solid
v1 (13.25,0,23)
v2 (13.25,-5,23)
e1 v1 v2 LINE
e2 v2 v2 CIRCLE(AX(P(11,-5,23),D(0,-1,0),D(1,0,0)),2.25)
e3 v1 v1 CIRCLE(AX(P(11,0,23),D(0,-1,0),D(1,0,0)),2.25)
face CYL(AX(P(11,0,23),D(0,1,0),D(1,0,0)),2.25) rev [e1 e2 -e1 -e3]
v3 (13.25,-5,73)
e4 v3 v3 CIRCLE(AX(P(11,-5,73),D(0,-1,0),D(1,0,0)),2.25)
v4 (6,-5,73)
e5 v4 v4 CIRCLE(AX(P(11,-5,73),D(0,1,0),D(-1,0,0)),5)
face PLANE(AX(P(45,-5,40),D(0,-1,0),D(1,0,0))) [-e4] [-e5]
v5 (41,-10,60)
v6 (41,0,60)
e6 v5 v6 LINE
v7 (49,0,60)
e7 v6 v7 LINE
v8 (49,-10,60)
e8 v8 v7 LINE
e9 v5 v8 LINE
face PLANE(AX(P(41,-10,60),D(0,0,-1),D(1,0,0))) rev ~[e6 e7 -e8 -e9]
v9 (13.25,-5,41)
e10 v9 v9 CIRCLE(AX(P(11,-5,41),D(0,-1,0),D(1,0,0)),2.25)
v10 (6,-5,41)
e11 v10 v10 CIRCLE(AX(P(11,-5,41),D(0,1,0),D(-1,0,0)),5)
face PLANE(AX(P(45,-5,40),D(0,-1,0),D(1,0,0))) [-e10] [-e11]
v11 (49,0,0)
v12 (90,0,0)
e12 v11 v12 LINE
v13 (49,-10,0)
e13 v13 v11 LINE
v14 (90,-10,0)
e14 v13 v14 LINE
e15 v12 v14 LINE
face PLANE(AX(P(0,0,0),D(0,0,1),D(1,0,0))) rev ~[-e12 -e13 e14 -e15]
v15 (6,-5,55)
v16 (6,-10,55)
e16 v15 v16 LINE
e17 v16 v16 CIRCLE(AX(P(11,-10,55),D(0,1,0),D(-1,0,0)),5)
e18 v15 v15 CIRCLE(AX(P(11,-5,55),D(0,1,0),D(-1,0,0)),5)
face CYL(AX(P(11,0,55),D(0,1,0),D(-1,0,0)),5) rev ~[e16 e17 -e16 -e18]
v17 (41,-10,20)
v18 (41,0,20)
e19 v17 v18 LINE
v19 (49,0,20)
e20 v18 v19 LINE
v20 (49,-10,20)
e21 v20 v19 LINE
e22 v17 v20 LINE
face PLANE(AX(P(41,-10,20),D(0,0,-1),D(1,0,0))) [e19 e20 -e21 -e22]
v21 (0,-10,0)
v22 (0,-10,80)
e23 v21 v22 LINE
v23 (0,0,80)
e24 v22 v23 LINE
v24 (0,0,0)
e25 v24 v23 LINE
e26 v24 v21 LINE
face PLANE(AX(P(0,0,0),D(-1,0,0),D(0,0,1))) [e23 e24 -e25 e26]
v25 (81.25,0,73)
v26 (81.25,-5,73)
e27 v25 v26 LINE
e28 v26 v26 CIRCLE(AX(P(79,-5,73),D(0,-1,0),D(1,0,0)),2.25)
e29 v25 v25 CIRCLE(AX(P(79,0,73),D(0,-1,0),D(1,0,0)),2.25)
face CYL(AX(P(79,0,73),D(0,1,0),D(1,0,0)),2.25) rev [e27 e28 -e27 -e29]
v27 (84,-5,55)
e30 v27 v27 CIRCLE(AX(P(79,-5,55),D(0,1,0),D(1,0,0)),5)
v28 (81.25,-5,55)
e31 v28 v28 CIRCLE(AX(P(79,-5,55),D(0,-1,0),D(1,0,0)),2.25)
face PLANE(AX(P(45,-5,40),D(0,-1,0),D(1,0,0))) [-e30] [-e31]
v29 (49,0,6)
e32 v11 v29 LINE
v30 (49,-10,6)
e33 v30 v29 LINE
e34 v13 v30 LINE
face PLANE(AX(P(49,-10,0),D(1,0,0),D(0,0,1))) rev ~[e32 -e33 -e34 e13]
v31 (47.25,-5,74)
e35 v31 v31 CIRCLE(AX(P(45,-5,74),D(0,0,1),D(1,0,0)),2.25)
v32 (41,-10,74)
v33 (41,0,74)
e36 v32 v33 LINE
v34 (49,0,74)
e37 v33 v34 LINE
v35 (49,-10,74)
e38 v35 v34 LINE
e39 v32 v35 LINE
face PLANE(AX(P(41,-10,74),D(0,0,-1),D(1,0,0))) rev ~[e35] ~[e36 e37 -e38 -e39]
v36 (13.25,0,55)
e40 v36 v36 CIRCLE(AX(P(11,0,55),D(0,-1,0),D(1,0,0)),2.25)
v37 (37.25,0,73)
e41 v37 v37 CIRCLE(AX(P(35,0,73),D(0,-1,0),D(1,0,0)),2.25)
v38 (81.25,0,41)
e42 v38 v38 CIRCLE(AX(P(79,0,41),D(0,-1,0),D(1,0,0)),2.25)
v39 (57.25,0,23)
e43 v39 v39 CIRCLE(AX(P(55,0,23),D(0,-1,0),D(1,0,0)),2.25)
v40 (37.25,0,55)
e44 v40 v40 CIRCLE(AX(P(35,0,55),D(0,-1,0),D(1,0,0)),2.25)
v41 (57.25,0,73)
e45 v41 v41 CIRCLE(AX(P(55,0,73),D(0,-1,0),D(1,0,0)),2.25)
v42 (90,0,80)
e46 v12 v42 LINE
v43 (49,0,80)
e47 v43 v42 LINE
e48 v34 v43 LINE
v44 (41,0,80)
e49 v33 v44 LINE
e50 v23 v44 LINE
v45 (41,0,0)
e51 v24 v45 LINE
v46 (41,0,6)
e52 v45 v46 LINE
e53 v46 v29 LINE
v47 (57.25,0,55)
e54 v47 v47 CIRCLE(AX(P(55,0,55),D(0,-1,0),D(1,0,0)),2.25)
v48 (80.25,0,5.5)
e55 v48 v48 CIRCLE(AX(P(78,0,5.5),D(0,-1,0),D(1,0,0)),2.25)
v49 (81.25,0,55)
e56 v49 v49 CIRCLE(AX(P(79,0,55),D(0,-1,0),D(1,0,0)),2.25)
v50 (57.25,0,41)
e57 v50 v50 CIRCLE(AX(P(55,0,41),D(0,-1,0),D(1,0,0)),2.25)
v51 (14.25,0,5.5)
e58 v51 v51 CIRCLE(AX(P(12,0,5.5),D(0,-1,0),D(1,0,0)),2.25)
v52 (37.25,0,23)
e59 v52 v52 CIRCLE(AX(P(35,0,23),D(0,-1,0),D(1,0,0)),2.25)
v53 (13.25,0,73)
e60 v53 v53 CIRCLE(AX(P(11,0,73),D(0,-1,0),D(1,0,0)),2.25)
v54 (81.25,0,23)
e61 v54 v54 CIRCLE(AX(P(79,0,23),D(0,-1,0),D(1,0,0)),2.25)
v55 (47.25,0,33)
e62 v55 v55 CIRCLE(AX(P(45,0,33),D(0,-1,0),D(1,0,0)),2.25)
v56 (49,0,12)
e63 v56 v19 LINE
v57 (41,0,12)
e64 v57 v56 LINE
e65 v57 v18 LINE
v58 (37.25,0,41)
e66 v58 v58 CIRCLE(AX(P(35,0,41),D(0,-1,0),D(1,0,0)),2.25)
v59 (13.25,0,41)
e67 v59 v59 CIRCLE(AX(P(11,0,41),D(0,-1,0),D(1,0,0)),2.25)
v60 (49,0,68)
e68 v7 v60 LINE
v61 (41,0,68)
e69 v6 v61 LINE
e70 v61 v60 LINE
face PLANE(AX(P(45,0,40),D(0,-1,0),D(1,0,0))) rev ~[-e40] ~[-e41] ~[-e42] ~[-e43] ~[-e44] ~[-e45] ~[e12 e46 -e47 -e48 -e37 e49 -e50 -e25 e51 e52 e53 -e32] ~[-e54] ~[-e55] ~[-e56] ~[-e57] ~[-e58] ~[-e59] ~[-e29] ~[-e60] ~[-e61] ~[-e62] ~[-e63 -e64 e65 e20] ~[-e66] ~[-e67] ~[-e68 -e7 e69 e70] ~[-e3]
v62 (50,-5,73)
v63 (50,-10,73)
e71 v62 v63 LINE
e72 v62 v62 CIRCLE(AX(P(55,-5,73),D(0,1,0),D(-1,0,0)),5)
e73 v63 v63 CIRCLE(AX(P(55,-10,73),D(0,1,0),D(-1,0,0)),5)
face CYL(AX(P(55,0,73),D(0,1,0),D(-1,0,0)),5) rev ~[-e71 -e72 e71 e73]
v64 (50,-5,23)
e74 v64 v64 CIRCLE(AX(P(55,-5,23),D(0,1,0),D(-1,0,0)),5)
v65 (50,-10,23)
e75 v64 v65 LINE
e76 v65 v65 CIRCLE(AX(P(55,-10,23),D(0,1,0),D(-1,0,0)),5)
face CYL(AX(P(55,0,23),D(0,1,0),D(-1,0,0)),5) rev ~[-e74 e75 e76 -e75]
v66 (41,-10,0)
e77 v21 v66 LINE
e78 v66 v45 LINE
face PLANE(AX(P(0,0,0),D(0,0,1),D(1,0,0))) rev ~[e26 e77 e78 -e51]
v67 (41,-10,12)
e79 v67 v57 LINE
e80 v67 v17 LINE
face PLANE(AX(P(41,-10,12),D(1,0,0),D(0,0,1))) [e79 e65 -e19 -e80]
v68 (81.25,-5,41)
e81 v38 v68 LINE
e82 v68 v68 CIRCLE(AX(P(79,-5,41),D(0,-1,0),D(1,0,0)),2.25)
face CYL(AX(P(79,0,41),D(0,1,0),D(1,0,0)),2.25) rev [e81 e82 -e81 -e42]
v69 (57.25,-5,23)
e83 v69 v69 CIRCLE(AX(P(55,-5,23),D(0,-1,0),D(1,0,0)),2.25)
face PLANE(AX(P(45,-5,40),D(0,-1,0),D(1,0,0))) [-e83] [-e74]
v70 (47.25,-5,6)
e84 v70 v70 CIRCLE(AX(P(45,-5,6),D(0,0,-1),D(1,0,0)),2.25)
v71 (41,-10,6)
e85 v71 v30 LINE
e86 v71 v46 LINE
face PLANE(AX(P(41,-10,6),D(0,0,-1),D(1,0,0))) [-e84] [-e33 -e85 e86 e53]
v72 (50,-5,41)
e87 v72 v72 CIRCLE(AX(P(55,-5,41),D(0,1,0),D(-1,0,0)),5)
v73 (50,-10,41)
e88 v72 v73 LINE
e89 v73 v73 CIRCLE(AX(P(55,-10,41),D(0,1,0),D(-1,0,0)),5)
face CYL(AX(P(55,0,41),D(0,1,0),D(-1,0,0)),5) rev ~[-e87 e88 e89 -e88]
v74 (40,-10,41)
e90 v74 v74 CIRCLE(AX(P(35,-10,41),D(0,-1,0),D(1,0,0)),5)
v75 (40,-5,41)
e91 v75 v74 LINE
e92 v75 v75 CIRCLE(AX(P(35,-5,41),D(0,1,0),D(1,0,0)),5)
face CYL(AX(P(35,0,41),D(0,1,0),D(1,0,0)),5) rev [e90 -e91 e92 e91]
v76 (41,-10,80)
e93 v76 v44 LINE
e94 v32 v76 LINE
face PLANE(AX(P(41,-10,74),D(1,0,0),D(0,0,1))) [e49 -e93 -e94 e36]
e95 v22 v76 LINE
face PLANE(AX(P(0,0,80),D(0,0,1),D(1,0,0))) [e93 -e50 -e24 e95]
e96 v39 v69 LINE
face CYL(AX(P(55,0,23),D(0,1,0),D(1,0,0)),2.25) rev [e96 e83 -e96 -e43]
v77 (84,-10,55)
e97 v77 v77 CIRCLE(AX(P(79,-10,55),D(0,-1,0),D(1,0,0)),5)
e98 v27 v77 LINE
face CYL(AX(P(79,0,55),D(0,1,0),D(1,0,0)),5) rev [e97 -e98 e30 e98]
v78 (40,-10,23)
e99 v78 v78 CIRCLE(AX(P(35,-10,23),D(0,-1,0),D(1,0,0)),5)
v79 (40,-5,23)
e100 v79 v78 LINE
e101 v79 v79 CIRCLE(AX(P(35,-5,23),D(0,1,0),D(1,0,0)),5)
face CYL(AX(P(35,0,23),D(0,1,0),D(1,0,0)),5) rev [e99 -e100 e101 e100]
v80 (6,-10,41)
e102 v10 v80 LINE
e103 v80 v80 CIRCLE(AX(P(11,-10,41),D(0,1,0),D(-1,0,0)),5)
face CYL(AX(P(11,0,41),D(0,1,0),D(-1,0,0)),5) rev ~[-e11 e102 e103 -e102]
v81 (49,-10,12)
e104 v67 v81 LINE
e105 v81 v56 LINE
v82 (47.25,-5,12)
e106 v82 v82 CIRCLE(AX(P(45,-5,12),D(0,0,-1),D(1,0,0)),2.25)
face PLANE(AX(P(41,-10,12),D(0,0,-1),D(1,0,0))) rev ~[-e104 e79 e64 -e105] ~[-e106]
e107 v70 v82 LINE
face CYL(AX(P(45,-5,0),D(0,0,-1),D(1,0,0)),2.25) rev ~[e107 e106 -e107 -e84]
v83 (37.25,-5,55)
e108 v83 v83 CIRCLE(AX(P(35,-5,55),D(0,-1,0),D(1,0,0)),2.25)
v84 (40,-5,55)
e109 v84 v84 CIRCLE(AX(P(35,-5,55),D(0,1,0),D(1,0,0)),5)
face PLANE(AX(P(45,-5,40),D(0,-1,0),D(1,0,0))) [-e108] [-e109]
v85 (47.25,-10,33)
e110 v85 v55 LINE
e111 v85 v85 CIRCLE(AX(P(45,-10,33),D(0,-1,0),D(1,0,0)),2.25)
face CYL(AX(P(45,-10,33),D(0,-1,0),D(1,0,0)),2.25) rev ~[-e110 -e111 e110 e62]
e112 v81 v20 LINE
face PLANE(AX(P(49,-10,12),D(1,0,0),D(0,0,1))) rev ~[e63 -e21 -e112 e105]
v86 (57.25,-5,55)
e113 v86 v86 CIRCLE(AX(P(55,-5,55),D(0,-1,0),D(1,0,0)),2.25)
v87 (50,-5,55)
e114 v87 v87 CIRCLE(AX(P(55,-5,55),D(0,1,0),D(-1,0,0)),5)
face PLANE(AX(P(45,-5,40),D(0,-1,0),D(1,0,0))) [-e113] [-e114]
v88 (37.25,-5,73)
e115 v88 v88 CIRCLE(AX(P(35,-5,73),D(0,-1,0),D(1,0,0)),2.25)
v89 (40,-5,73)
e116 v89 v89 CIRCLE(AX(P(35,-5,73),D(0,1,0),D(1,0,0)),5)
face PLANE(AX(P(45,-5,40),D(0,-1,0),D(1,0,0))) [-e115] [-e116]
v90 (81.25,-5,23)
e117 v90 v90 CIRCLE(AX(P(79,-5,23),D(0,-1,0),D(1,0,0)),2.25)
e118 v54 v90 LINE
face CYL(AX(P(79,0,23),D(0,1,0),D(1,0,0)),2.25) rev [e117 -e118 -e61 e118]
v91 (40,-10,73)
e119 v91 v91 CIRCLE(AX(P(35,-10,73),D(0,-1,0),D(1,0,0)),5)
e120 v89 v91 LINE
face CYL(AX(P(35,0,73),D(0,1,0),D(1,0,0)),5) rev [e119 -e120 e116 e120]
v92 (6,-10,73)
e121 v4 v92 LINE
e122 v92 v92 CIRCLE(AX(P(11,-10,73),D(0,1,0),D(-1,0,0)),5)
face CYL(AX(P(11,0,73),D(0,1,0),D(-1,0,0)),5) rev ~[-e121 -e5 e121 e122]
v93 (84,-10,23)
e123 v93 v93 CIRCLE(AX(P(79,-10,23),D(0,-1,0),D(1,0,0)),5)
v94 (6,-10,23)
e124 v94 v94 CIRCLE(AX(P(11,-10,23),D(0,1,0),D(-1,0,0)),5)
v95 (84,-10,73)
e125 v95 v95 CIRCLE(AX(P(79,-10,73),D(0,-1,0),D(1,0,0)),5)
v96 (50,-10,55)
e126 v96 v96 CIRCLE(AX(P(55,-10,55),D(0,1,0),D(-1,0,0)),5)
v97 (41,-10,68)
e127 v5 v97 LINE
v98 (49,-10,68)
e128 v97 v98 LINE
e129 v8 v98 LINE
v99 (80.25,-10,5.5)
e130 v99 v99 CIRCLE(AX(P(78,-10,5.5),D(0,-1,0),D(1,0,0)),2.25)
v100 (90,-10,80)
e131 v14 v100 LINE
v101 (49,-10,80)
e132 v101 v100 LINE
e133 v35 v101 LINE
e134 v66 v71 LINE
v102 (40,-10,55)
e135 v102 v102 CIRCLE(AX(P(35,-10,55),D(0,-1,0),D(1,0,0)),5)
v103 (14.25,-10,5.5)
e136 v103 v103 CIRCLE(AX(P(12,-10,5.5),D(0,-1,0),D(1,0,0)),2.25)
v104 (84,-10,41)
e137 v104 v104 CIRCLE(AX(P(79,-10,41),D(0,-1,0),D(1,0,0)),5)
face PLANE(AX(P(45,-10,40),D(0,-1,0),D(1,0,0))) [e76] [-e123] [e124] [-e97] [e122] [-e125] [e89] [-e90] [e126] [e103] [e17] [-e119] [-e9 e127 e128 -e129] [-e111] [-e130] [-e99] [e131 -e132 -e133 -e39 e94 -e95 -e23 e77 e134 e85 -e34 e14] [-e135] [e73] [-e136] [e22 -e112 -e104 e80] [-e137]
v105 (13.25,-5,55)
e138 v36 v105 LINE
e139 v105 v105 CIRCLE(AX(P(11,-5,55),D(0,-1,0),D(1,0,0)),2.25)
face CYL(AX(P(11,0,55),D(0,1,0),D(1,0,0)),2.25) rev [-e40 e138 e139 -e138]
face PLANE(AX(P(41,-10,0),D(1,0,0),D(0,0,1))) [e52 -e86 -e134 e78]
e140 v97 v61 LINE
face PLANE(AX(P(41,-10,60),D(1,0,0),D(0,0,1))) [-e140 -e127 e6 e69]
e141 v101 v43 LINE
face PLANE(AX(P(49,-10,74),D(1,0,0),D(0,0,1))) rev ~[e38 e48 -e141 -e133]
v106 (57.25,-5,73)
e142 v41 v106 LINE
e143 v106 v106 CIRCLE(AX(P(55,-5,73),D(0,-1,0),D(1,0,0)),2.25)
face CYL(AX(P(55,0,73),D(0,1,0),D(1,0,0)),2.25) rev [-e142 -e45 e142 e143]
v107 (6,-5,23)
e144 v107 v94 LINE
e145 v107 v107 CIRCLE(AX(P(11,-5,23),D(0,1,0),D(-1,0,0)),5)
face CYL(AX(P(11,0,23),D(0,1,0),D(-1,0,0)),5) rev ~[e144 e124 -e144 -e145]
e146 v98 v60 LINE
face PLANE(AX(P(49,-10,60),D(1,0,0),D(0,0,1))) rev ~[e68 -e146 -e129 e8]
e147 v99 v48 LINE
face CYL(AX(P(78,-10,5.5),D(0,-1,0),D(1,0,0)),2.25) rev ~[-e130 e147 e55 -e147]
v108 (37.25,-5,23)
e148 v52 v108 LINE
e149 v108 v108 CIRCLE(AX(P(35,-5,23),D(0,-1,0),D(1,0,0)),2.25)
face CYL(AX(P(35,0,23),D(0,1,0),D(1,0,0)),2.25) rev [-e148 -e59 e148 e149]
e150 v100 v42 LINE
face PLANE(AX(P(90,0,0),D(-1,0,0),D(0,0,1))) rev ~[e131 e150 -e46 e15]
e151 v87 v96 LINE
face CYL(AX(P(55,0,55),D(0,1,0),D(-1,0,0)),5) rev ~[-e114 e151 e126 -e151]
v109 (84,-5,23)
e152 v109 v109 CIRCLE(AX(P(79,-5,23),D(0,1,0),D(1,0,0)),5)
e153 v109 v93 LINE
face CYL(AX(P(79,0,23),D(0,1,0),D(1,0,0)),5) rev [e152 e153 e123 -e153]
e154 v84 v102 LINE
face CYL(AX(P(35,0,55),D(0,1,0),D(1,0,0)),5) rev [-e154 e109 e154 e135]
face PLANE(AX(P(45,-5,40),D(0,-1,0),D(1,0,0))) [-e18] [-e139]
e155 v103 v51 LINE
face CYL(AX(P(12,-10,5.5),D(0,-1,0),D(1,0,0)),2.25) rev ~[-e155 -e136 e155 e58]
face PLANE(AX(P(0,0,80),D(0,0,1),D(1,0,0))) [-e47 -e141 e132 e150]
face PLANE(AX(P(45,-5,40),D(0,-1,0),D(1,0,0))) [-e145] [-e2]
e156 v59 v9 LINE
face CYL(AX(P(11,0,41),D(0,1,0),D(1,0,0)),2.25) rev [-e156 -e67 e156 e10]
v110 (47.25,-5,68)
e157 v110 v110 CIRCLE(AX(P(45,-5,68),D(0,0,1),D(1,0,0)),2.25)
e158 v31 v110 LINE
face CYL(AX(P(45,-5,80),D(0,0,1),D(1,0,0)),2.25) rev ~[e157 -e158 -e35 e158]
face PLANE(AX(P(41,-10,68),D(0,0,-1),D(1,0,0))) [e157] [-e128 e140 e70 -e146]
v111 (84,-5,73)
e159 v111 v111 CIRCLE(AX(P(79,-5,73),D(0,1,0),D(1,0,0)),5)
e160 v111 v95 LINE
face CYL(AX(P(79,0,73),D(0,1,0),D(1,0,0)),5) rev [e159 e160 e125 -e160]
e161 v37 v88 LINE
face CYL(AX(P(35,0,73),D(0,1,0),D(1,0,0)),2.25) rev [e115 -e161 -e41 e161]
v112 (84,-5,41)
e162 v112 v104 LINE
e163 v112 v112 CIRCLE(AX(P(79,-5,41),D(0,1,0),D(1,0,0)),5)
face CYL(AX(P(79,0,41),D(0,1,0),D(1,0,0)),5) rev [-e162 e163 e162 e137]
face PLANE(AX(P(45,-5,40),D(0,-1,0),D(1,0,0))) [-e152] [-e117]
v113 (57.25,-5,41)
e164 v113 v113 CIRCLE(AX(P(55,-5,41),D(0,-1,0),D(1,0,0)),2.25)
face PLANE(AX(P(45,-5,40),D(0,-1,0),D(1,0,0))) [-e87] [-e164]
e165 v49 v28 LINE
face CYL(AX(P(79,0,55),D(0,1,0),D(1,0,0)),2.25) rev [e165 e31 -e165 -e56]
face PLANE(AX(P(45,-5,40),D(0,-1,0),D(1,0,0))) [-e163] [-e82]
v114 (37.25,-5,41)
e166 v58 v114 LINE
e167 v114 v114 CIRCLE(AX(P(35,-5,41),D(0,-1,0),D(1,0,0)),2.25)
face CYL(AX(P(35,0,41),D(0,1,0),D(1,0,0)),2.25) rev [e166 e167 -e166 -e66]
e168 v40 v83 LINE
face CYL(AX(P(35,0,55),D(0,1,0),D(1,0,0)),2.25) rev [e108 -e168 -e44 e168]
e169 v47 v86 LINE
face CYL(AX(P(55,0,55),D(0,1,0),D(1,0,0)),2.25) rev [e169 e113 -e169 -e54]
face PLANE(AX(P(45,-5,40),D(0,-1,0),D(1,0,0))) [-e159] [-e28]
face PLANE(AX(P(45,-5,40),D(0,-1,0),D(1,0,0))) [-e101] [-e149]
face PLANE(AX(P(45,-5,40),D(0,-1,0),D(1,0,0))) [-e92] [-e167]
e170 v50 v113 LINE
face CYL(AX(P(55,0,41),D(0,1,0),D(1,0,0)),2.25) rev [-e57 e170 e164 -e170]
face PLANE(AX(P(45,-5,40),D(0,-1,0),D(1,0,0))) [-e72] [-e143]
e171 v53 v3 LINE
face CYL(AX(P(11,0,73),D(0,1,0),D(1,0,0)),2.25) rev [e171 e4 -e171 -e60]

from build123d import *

# Parameters (mm, degrees)
F0_W      = 90
F0_H      = 80
F0_R      = 5
F0_R_2    = 2.25
F1_DEPTH  = 5
F2_DEPTH  = 10
F3_W      = 8
F3_H      = 8
F3_H_2    = 6
F4_DEPTH  = 10.001
F5_R      = 2.25
F6_DEPTH  = 20
F7_R      = 2.25
F8_DEPTH  = 20
F9_R      = 2.25
F10_DEPTH = 10.001


# Not quite as in the source:
# - a feature names something its author has since deleted; it is built from what else it names


with BuildPart() as f1:
    # F0 (on Front) → F1 (new body)
    with BuildSketch(Plane.XZ):
        with Locations((45, 40)):
            Rectangle(F0_W, F0_H)
        Polygon((40, 23), (40, 17), (6, 17), (6, 23), (6, 41), (6, 47), (40, 47), (40, 41), align=None, mode=Mode.SUBTRACT)
        Polygon((84, 23), (84, 17), (50, 17), (50, 23), (50, 41), (50, 47), (84, 47), (84, 41), align=None, mode=Mode.SUBTRACT)
        Polygon((6, 73), (6, 79), (40, 79), (40, 73), (40, 55), (40, 49), (6, 49), (6, 55), align=None, mode=Mode.SUBTRACT)
        Polygon((84, 55), (84, 49), (50, 49), (50, 55), (50, 73), (50, 79), (84, 79), (84, 73), align=None, mode=Mode.SUBTRACT)
        Polygon((40, 79), (6, 79), (6, 73), (6, 55), (6, 49), (40, 49), (40, 55), (40, 73), align=None)
        with BuildLine():
            ThreePointArc((16, 55), (11, 50), (6, 55))
            ThreePointArc((6, 55), (11, 60), (16, 55))
        make_face(mode=Mode.SUBTRACT)
        with Locations((35, 55)):
            Circle(F0_R, mode=Mode.SUBTRACT)
        with BuildLine():
            ThreePointArc((16, 73), (11, 68), (6, 73))
            ThreePointArc((6, 73), (11, 78), (16, 73))
        make_face(mode=Mode.SUBTRACT)
        with Locations((35, 73)):
            Circle(F0_R, mode=Mode.SUBTRACT)
        Polygon((50, 49), (84, 49), (84, 55), (84, 73), (84, 79), (50, 79), (50, 73), (50, 55), align=None)
        with BuildLine():
            ThreePointArc((60, 55), (55, 50), (50, 55))
            ThreePointArc((50, 55), (55, 60), (60, 55))
        make_face(mode=Mode.SUBTRACT)
        with Locations((79, 55)):
            Circle(F0_R, mode=Mode.SUBTRACT)
        with BuildLine():
            ThreePointArc((60, 73), (55, 68), (50, 73))
            ThreePointArc((50, 73), (55, 78), (60, 73))
        make_face(mode=Mode.SUBTRACT)
        with Locations((79, 73)):
            Circle(F0_R, mode=Mode.SUBTRACT)
        Polygon((6, 17), (40, 17), (40, 23), (40, 41), (40, 47), (6, 47), (6, 41), (6, 23), align=None)
        with BuildLine():
            ThreePointArc((16, 23), (11, 18), (6, 23))
            ThreePointArc((6, 23), (11, 28), (16, 23))
        make_face(mode=Mode.SUBTRACT)
        with Locations((35, 23)):
            Circle(F0_R, mode=Mode.SUBTRACT)
        with BuildLine():
            ThreePointArc((16, 41), (11, 36), (6, 41))
            ThreePointArc((6, 41), (11, 46), (16, 41))
        make_face(mode=Mode.SUBTRACT)
        with Locations((35, 41)):
            Circle(F0_R, mode=Mode.SUBTRACT)
        Polygon((50, 17), (84, 17), (84, 23), (84, 41), (84, 47), (50, 47), (50, 41), (50, 23), align=None)
        with BuildLine():
            ThreePointArc((60, 23), (55, 18), (50, 23))
            ThreePointArc((50, 23), (55, 28), (60, 23))
        make_face(mode=Mode.SUBTRACT)
        with Locations((79, 23)):
            Circle(F0_R, mode=Mode.SUBTRACT)
        with BuildLine():
            ThreePointArc((60, 41), (55, 36), (50, 41))
            ThreePointArc((50, 41), (55, 46), (60, 41))
        make_face(mode=Mode.SUBTRACT)
        with Locations((79, 41)):
            Circle(F0_R, mode=Mode.SUBTRACT)
        with Locations((79, 41)):
            Circle(F0_R)
        with Locations((79, 41)):
            Circle(F0_R_2, mode=Mode.SUBTRACT)
        with BuildLine():
            ThreePointArc((16, 23), (11, 28), (6, 23))
            ThreePointArc((6, 23), (11, 18), (16, 23))
        make_face()
        with Locations((11, 23)):
            Circle(F0_R_2, mode=Mode.SUBTRACT)
        with BuildLine():
            ThreePointArc((16, 73), (11, 78), (6, 73))
            ThreePointArc((6, 73), (11, 68), (16, 73))
        make_face()
        with Locations((11, 73)):
            Circle(F0_R_2, mode=Mode.SUBTRACT)
        with Locations((35, 73)):
            Circle(F0_R)
        with Locations((35, 73)):
            Circle(F0_R_2, mode=Mode.SUBTRACT)
        with BuildLine():
            ThreePointArc((60, 73), (55, 78), (50, 73))
            ThreePointArc((50, 73), (55, 68), (60, 73))
        make_face()
        with Locations((55, 73)):
            Circle(F0_R_2, mode=Mode.SUBTRACT)
        with Locations((79, 73)):
            Circle(F0_R)
        with Locations((79, 73)):
            Circle(F0_R_2, mode=Mode.SUBTRACT)
        with Locations((79, 55)):
            Circle(F0_R)
        with Locations((79, 55)):
            Circle(F0_R_2, mode=Mode.SUBTRACT)
        with BuildLine():
            ThreePointArc((60, 55), (55, 60), (50, 55))
            ThreePointArc((50, 55), (55, 50), (60, 55))
        make_face()
        with Locations((55, 55)):
            Circle(F0_R_2, mode=Mode.SUBTRACT)
        with Locations((35, 55)):
            Circle(F0_R)
        with Locations((35, 55)):
            Circle(F0_R_2, mode=Mode.SUBTRACT)
        with BuildLine():
            ThreePointArc((16, 55), (11, 60), (6, 55))
            ThreePointArc((6, 55), (11, 50), (16, 55))
        make_face()
        with Locations((11, 55)):
            Circle(F0_R_2, mode=Mode.SUBTRACT)
        with Locations((35, 41)):
            Circle(F0_R)
        with Locations((35, 41)):
            Circle(F0_R_2, mode=Mode.SUBTRACT)
        with Locations((35, 23)):
            Circle(F0_R)
        with Locations((35, 23)):
            Circle(F0_R_2, mode=Mode.SUBTRACT)
        with BuildLine():
            ThreePointArc((16, 41), (11, 46), (6, 41))
            ThreePointArc((6, 41), (11, 36), (16, 41))
        make_face()
        with Locations((11, 41)):
            Circle(F0_R_2, mode=Mode.SUBTRACT)
        with BuildLine():
            ThreePointArc((60, 23), (55, 28), (50, 23))
            ThreePointArc((50, 23), (55, 18), (60, 23))
        make_face()
        with Locations((55, 23)):
            Circle(F0_R_2, mode=Mode.SUBTRACT)
        with BuildLine():
            ThreePointArc((60, 41), (55, 46), (50, 41))
            ThreePointArc((50, 41), (55, 36), (60, 41))
        make_face()
        with Locations((55, 41)):
            Circle(F0_R_2, mode=Mode.SUBTRACT)
        with Locations((79, 23)):
            Circle(F0_R)
        with Locations((79, 23)):
            Circle(F0_R_2, mode=Mode.SUBTRACT)
    extrude(amount=F1_DEPTH)

    # F0 (on Front) → F2 (join)
    with BuildSketch(Plane.XZ):
        with Locations((45, 40)):
            Rectangle(F0_W, F0_H)
        Polygon((40, 23), (40, 17), (6, 17), (6, 23), (6, 41), (6, 47), (40, 47), (40, 41), align=None, mode=Mode.SUBTRACT)
        Polygon((84, 23), (84, 17), (50, 17), (50, 23), (50, 41), (50, 47), (84, 47), (84, 41), align=None, mode=Mode.SUBTRACT)
        Polygon((6, 73), (6, 79), (40, 79), (40, 73), (40, 55), (40, 49), (6, 49), (6, 55), align=None, mode=Mode.SUBTRACT)
        Polygon((84, 55), (84, 49), (50, 49), (50, 55), (50, 73), (50, 79), (84, 79), (84, 73), align=None, mode=Mode.SUBTRACT)
        Polygon((50, 49), (84, 49), (84, 55), (84, 73), (84, 79), (50, 79), (50, 73), (50, 55), align=None)
        with BuildLine():
            ThreePointArc((60, 55), (55, 50), (50, 55))
            ThreePointArc((50, 55), (55, 60), (60, 55))
        make_face(mode=Mode.SUBTRACT)
        with Locations((79, 55)):
            Circle(F0_R, mode=Mode.SUBTRACT)
        with BuildLine():
            ThreePointArc((60, 73), (55, 68), (50, 73))
            ThreePointArc((50, 73), (55, 78), (60, 73))
        make_face(mode=Mode.SUBTRACT)
        with Locations((79, 73)):
            Circle(F0_R, mode=Mode.SUBTRACT)
        Polygon((50, 17), (84, 17), (84, 23), (84, 41), (84, 47), (50, 47), (50, 41), (50, 23), align=None)
        with BuildLine():
            ThreePointArc((60, 23), (55, 18), (50, 23))
            ThreePointArc((50, 23), (55, 28), (60, 23))
        make_face(mode=Mode.SUBTRACT)
        with Locations((79, 23)):
            Circle(F0_R, mode=Mode.SUBTRACT)
        with BuildLine():
            ThreePointArc((60, 41), (55, 36), (50, 41))
            ThreePointArc((50, 41), (55, 46), (60, 41))
        make_face(mode=Mode.SUBTRACT)
        with Locations((79, 41)):
            Circle(F0_R, mode=Mode.SUBTRACT)
        Polygon((6, 17), (40, 17), (40, 23), (40, 41), (40, 47), (6, 47), (6, 41), (6, 23), align=None)
        with BuildLine():
            ThreePointArc((16, 23), (11, 18), (6, 23))
            ThreePointArc((6, 23), (11, 28), (16, 23))
        make_face(mode=Mode.SUBTRACT)
        with Locations((35, 23)):
            Circle(F0_R, mode=Mode.SUBTRACT)
        with BuildLine():
            ThreePointArc((16, 41), (11, 36), (6, 41))
            ThreePointArc((6, 41), (11, 46), (16, 41))
        make_face(mode=Mode.SUBTRACT)
        with Locations((35, 41)):
            Circle(F0_R, mode=Mode.SUBTRACT)
        Polygon((40, 79), (6, 79), (6, 73), (6, 55), (6, 49), (40, 49), (40, 55), (40, 73), align=None)
        with BuildLine():
            ThreePointArc((16, 55), (11, 50), (6, 55))
            ThreePointArc((6, 55), (11, 60), (16, 55))
        make_face(mode=Mode.SUBTRACT)
        with Locations((35, 55)):
            Circle(F0_R, mode=Mode.SUBTRACT)
        with BuildLine():
            ThreePointArc((16, 73), (11, 68), (6, 73))
            ThreePointArc((6, 73), (11, 78), (16, 73))
        make_face(mode=Mode.SUBTRACT)
        with Locations((35, 73)):
            Circle(F0_R, mode=Mode.SUBTRACT)
    extrude(amount=F2_DEPTH)

    # F3 (on face) → F4 (cut, through all)
    with BuildSketch(Plane.XZ.offset(10)):
        with Locations((45, 64)):
            Rectangle(F3_W, F3_H)
        with Locations((45, 77)):
            Rectangle(F3_W, F3_H_2)
        with Locations((45, 16)):
            Rectangle(F3_W, F3_H)
        with Locations((45, 3)):
            Rectangle(F3_W, F3_H_2)
    extrude(amount=-F4_DEPTH, mode=Mode.SUBTRACT)

    # F5 (on face) → F6 (cut)
    with BuildSketch(Plane.XY.offset(80)):
        with Locations((45, -5)):
            Circle(F5_R)
    extrude(amount=-F6_DEPTH, mode=Mode.SUBTRACT)

    # F7 (on face) → F8 (cut)
    with BuildSketch(Plane(origin=(0, 0, 0), x_dir=(1, 0, 0), z_dir=(0, 0, -1))):
        with Locations((45, 5)):
            Circle(F7_R)
    extrude(amount=-F8_DEPTH, mode=Mode.SUBTRACT)

    # F9 (on face) → F10 (cut, through all)
    with BuildSketch(Plane.XZ.offset(10)):
        with Locations((45, 33)):
            Circle(F9_R)
        with Locations((12, 5.5)):
            Circle(F9_R)
        with Locations((78, 5.5)):
            Circle(F9_R)
    extrude(amount=-F10_DEPTH, mode=Mode.SUBTRACT)


solid = f1.part
